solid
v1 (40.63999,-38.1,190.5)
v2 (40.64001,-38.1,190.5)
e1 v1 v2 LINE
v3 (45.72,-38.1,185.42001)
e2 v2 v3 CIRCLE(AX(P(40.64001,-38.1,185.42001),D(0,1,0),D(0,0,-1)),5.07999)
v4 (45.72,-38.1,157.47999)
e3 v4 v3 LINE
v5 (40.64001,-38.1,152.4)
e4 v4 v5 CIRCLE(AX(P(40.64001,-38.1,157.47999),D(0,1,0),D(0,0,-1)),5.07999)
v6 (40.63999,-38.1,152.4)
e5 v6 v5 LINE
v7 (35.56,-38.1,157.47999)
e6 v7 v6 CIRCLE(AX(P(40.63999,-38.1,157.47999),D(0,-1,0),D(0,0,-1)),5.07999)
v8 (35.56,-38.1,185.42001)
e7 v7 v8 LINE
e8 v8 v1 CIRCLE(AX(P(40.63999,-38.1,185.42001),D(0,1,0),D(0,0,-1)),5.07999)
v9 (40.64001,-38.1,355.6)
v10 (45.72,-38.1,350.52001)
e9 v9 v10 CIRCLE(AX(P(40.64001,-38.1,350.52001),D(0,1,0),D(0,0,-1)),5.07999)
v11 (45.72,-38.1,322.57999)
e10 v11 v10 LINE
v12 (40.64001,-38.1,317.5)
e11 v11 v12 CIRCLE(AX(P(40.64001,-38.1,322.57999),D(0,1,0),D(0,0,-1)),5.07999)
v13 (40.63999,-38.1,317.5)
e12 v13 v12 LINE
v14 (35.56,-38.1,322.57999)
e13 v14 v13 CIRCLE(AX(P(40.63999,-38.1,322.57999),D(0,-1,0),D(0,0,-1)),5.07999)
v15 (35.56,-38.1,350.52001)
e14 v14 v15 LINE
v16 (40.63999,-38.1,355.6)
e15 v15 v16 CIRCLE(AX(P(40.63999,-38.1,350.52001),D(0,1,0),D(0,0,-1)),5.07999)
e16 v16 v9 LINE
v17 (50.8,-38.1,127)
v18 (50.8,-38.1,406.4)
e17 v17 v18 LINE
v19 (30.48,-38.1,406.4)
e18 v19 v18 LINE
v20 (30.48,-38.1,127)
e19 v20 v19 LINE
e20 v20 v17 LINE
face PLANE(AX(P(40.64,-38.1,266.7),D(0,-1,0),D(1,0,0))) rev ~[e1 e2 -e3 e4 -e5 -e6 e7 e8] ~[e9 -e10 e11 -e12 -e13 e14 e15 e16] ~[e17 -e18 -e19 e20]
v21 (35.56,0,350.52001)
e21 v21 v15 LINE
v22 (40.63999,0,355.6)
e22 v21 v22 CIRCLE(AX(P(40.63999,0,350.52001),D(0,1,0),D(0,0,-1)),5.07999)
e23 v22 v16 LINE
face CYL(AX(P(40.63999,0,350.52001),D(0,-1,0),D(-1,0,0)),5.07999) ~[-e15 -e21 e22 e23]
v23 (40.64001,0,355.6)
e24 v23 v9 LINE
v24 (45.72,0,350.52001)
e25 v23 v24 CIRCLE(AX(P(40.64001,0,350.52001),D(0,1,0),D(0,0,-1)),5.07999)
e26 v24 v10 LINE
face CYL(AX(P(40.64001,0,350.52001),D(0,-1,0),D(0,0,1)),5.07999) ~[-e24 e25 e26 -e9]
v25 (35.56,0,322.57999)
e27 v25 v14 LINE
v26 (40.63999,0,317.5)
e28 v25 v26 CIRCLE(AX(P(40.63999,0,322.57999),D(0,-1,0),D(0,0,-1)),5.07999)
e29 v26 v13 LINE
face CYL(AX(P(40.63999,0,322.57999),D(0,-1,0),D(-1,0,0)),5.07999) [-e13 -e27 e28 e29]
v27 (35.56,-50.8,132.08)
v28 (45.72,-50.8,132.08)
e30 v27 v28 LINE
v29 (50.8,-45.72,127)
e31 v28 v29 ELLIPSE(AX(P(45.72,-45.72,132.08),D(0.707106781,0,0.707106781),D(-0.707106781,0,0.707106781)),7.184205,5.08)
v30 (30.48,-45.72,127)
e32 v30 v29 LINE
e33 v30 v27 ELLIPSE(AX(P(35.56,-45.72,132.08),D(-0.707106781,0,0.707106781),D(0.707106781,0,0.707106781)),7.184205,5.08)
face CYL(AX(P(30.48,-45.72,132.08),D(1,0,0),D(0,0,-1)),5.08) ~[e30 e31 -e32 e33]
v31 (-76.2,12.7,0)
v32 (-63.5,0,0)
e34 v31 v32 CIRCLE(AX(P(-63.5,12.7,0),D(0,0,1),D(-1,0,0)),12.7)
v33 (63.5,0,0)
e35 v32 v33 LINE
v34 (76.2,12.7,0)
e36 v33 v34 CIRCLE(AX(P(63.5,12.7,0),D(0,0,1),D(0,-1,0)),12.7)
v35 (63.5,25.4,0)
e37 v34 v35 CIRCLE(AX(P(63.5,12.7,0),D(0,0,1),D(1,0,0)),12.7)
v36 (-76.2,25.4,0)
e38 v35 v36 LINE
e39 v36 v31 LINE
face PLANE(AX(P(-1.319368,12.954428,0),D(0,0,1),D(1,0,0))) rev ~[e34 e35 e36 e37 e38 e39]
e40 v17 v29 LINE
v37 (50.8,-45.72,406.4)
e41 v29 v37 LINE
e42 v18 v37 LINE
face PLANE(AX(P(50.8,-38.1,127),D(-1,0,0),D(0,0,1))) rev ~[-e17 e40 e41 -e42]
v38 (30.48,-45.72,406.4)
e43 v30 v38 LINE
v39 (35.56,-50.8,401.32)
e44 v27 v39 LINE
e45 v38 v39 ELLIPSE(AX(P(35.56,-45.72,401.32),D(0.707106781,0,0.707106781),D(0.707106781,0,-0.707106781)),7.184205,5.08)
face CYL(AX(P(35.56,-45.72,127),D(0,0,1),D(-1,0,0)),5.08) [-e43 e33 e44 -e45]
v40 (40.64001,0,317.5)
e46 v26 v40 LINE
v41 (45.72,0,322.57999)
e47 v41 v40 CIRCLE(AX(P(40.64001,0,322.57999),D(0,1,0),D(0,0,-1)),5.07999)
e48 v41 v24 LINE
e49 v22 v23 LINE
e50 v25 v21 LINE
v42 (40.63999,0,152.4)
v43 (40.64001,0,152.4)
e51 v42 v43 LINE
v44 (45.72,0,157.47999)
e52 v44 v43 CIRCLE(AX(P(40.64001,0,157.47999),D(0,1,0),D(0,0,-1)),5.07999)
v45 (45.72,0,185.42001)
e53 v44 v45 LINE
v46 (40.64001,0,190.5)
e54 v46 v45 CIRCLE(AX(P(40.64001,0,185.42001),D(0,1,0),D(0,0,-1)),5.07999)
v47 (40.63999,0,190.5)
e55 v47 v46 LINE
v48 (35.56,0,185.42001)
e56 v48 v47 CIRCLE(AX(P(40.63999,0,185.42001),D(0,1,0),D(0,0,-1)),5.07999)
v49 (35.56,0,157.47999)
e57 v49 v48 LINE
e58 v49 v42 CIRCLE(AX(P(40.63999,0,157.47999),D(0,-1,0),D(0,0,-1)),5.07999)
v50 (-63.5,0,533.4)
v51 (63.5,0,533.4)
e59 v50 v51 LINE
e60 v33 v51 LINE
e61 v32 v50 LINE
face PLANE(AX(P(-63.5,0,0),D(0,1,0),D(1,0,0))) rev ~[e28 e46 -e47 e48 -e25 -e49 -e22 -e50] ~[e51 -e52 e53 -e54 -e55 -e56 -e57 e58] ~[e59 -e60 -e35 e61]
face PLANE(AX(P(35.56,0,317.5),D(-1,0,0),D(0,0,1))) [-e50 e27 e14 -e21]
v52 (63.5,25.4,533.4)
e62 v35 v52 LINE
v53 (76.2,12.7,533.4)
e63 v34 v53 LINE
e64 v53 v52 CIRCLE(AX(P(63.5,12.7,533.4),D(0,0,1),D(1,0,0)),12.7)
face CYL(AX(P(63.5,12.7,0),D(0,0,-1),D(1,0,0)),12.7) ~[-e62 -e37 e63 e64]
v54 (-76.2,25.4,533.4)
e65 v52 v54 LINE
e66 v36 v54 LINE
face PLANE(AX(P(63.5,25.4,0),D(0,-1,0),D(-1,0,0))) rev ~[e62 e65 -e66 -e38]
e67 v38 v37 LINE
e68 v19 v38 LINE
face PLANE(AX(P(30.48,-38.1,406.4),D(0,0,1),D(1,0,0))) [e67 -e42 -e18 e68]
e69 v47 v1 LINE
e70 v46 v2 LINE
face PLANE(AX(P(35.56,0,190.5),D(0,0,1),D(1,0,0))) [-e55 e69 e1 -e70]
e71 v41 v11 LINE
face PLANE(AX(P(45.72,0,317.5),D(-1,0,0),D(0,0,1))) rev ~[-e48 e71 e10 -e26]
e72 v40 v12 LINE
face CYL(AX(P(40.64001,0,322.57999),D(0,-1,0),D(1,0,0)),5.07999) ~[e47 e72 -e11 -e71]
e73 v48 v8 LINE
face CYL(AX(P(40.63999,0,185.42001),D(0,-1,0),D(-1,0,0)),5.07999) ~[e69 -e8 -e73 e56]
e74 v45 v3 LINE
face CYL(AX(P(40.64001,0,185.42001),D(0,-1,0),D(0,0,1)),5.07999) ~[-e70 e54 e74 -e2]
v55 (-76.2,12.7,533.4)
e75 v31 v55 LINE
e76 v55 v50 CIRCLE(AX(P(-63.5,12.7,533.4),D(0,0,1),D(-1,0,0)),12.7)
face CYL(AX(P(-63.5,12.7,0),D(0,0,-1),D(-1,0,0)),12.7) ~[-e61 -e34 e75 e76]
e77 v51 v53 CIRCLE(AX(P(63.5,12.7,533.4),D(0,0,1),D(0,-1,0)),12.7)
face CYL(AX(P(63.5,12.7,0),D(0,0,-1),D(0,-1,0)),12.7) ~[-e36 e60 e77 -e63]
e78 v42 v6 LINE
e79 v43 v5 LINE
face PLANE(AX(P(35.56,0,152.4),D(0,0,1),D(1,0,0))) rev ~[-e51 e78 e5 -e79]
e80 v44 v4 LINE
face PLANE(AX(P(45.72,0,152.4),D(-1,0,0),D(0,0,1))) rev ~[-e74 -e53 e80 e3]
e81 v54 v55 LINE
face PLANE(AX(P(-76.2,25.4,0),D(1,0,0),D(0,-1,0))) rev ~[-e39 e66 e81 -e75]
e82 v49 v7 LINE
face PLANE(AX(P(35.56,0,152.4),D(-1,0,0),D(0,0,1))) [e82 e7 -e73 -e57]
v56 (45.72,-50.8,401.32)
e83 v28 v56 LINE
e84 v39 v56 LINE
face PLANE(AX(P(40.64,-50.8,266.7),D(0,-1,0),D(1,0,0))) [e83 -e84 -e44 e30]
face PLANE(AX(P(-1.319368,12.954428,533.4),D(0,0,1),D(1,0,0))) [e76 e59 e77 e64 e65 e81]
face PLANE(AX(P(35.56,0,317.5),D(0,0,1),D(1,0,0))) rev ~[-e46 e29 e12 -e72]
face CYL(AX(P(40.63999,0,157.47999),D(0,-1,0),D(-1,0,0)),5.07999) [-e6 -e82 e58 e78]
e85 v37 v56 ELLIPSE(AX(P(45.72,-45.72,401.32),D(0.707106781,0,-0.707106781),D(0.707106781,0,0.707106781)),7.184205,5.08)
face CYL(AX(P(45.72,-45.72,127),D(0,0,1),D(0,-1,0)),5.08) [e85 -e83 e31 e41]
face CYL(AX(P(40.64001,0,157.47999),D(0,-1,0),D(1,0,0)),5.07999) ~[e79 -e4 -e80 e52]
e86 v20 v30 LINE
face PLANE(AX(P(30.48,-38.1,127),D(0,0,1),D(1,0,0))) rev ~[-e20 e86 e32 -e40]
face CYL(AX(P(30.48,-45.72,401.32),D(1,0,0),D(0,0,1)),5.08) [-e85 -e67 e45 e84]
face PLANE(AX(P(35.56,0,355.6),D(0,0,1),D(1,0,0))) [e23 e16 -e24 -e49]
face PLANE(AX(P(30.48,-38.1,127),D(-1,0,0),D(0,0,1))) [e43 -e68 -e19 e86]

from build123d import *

# Parameters (mm, degrees)
F1_DEPTH = 533.4
F4_W     = 10.16
F4_H     = 38.1
F5_DEPTH = 38.1
F6_R     = 5.07999
F3_W     = 20.32
F3_H     = 279.4
F7_DEPTH = 12.7
F8_R     = 5.08


# Not quite as in the source:
# - a fillet or chamfer is up to 0.001 mm smaller than in the source, because OpenCascade refuses the exact size


with BuildPart() as f1:
    # F0 (on Top) → F1 (new body)
    with BuildSketch(Plane.XY):
        with BuildLine():
            Line((63.5, 25.4), (-76.2, 25.4))
            Line((-76.2, 25.4), (-76.2, 12.7))
            ThreePointArc((-76.2, 12.7), (-72.4802561211, 3.7197438789), (-63.5, 0))
            Line((-63.5, 0), (63.5, 0))
            ThreePointArc((63.5, 0), (72.4802561211, 3.7197438789), (76.2, 12.7))
            ThreePointArc((76.2, 12.7), (72.4802561211, 21.6802561211), (63.5, 25.4))
        make_face()
    extrude(amount=F1_DEPTH)

    # F4 (on face) → F5 (join, through all)
    with BuildSketch(Plane.XZ):
        with Locations((40.64, 336.55)):
            Rectangle(F4_W, F4_H)
        with Locations((40.64, 171.45)):
            Rectangle(F4_W, F4_H)
    extrude(amount=F5_DEPTH)

    # F6 (radius 5.08 in the source; OpenCascade refuses exactly that, so slightly less here)
    f6_edges = [f1.edges().sort_by_distance(p)[0] for p in [
        (35.56, -19.05, 355.6),
        (45.72, -19.05, 355.6),
        (45.72, -19.05, 317.5),
        (35.56, -19.05, 317.5),
        (35.56, -19.05, 190.5),
        (45.72, -19.05, 190.5),
        (35.56, -19.05, 152.4),
        (45.72, -19.05, 152.4),
    ]]
    fillet(f6_edges, radius=F6_R)

    # F3 (on offset) → F7 (join)
    with BuildSketch(Plane.XZ.offset(38.1)):
        with Locations((40.64, 266.7)):
            Rectangle(F3_W, F3_H)
    extrude(amount=F7_DEPTH)

    # F8
    f8_edges = [f1.edges().sort_by_distance(p)[0] for p in [
        (40.64, -50.8, 406.4),
        (30.48, -50.8, 266.7),
        (50.8, -50.8, 266.7),
        (40.64, -50.8, 127),
    ]]
    fillet(f8_edges, radius=F8_R)


solid = f1.part
